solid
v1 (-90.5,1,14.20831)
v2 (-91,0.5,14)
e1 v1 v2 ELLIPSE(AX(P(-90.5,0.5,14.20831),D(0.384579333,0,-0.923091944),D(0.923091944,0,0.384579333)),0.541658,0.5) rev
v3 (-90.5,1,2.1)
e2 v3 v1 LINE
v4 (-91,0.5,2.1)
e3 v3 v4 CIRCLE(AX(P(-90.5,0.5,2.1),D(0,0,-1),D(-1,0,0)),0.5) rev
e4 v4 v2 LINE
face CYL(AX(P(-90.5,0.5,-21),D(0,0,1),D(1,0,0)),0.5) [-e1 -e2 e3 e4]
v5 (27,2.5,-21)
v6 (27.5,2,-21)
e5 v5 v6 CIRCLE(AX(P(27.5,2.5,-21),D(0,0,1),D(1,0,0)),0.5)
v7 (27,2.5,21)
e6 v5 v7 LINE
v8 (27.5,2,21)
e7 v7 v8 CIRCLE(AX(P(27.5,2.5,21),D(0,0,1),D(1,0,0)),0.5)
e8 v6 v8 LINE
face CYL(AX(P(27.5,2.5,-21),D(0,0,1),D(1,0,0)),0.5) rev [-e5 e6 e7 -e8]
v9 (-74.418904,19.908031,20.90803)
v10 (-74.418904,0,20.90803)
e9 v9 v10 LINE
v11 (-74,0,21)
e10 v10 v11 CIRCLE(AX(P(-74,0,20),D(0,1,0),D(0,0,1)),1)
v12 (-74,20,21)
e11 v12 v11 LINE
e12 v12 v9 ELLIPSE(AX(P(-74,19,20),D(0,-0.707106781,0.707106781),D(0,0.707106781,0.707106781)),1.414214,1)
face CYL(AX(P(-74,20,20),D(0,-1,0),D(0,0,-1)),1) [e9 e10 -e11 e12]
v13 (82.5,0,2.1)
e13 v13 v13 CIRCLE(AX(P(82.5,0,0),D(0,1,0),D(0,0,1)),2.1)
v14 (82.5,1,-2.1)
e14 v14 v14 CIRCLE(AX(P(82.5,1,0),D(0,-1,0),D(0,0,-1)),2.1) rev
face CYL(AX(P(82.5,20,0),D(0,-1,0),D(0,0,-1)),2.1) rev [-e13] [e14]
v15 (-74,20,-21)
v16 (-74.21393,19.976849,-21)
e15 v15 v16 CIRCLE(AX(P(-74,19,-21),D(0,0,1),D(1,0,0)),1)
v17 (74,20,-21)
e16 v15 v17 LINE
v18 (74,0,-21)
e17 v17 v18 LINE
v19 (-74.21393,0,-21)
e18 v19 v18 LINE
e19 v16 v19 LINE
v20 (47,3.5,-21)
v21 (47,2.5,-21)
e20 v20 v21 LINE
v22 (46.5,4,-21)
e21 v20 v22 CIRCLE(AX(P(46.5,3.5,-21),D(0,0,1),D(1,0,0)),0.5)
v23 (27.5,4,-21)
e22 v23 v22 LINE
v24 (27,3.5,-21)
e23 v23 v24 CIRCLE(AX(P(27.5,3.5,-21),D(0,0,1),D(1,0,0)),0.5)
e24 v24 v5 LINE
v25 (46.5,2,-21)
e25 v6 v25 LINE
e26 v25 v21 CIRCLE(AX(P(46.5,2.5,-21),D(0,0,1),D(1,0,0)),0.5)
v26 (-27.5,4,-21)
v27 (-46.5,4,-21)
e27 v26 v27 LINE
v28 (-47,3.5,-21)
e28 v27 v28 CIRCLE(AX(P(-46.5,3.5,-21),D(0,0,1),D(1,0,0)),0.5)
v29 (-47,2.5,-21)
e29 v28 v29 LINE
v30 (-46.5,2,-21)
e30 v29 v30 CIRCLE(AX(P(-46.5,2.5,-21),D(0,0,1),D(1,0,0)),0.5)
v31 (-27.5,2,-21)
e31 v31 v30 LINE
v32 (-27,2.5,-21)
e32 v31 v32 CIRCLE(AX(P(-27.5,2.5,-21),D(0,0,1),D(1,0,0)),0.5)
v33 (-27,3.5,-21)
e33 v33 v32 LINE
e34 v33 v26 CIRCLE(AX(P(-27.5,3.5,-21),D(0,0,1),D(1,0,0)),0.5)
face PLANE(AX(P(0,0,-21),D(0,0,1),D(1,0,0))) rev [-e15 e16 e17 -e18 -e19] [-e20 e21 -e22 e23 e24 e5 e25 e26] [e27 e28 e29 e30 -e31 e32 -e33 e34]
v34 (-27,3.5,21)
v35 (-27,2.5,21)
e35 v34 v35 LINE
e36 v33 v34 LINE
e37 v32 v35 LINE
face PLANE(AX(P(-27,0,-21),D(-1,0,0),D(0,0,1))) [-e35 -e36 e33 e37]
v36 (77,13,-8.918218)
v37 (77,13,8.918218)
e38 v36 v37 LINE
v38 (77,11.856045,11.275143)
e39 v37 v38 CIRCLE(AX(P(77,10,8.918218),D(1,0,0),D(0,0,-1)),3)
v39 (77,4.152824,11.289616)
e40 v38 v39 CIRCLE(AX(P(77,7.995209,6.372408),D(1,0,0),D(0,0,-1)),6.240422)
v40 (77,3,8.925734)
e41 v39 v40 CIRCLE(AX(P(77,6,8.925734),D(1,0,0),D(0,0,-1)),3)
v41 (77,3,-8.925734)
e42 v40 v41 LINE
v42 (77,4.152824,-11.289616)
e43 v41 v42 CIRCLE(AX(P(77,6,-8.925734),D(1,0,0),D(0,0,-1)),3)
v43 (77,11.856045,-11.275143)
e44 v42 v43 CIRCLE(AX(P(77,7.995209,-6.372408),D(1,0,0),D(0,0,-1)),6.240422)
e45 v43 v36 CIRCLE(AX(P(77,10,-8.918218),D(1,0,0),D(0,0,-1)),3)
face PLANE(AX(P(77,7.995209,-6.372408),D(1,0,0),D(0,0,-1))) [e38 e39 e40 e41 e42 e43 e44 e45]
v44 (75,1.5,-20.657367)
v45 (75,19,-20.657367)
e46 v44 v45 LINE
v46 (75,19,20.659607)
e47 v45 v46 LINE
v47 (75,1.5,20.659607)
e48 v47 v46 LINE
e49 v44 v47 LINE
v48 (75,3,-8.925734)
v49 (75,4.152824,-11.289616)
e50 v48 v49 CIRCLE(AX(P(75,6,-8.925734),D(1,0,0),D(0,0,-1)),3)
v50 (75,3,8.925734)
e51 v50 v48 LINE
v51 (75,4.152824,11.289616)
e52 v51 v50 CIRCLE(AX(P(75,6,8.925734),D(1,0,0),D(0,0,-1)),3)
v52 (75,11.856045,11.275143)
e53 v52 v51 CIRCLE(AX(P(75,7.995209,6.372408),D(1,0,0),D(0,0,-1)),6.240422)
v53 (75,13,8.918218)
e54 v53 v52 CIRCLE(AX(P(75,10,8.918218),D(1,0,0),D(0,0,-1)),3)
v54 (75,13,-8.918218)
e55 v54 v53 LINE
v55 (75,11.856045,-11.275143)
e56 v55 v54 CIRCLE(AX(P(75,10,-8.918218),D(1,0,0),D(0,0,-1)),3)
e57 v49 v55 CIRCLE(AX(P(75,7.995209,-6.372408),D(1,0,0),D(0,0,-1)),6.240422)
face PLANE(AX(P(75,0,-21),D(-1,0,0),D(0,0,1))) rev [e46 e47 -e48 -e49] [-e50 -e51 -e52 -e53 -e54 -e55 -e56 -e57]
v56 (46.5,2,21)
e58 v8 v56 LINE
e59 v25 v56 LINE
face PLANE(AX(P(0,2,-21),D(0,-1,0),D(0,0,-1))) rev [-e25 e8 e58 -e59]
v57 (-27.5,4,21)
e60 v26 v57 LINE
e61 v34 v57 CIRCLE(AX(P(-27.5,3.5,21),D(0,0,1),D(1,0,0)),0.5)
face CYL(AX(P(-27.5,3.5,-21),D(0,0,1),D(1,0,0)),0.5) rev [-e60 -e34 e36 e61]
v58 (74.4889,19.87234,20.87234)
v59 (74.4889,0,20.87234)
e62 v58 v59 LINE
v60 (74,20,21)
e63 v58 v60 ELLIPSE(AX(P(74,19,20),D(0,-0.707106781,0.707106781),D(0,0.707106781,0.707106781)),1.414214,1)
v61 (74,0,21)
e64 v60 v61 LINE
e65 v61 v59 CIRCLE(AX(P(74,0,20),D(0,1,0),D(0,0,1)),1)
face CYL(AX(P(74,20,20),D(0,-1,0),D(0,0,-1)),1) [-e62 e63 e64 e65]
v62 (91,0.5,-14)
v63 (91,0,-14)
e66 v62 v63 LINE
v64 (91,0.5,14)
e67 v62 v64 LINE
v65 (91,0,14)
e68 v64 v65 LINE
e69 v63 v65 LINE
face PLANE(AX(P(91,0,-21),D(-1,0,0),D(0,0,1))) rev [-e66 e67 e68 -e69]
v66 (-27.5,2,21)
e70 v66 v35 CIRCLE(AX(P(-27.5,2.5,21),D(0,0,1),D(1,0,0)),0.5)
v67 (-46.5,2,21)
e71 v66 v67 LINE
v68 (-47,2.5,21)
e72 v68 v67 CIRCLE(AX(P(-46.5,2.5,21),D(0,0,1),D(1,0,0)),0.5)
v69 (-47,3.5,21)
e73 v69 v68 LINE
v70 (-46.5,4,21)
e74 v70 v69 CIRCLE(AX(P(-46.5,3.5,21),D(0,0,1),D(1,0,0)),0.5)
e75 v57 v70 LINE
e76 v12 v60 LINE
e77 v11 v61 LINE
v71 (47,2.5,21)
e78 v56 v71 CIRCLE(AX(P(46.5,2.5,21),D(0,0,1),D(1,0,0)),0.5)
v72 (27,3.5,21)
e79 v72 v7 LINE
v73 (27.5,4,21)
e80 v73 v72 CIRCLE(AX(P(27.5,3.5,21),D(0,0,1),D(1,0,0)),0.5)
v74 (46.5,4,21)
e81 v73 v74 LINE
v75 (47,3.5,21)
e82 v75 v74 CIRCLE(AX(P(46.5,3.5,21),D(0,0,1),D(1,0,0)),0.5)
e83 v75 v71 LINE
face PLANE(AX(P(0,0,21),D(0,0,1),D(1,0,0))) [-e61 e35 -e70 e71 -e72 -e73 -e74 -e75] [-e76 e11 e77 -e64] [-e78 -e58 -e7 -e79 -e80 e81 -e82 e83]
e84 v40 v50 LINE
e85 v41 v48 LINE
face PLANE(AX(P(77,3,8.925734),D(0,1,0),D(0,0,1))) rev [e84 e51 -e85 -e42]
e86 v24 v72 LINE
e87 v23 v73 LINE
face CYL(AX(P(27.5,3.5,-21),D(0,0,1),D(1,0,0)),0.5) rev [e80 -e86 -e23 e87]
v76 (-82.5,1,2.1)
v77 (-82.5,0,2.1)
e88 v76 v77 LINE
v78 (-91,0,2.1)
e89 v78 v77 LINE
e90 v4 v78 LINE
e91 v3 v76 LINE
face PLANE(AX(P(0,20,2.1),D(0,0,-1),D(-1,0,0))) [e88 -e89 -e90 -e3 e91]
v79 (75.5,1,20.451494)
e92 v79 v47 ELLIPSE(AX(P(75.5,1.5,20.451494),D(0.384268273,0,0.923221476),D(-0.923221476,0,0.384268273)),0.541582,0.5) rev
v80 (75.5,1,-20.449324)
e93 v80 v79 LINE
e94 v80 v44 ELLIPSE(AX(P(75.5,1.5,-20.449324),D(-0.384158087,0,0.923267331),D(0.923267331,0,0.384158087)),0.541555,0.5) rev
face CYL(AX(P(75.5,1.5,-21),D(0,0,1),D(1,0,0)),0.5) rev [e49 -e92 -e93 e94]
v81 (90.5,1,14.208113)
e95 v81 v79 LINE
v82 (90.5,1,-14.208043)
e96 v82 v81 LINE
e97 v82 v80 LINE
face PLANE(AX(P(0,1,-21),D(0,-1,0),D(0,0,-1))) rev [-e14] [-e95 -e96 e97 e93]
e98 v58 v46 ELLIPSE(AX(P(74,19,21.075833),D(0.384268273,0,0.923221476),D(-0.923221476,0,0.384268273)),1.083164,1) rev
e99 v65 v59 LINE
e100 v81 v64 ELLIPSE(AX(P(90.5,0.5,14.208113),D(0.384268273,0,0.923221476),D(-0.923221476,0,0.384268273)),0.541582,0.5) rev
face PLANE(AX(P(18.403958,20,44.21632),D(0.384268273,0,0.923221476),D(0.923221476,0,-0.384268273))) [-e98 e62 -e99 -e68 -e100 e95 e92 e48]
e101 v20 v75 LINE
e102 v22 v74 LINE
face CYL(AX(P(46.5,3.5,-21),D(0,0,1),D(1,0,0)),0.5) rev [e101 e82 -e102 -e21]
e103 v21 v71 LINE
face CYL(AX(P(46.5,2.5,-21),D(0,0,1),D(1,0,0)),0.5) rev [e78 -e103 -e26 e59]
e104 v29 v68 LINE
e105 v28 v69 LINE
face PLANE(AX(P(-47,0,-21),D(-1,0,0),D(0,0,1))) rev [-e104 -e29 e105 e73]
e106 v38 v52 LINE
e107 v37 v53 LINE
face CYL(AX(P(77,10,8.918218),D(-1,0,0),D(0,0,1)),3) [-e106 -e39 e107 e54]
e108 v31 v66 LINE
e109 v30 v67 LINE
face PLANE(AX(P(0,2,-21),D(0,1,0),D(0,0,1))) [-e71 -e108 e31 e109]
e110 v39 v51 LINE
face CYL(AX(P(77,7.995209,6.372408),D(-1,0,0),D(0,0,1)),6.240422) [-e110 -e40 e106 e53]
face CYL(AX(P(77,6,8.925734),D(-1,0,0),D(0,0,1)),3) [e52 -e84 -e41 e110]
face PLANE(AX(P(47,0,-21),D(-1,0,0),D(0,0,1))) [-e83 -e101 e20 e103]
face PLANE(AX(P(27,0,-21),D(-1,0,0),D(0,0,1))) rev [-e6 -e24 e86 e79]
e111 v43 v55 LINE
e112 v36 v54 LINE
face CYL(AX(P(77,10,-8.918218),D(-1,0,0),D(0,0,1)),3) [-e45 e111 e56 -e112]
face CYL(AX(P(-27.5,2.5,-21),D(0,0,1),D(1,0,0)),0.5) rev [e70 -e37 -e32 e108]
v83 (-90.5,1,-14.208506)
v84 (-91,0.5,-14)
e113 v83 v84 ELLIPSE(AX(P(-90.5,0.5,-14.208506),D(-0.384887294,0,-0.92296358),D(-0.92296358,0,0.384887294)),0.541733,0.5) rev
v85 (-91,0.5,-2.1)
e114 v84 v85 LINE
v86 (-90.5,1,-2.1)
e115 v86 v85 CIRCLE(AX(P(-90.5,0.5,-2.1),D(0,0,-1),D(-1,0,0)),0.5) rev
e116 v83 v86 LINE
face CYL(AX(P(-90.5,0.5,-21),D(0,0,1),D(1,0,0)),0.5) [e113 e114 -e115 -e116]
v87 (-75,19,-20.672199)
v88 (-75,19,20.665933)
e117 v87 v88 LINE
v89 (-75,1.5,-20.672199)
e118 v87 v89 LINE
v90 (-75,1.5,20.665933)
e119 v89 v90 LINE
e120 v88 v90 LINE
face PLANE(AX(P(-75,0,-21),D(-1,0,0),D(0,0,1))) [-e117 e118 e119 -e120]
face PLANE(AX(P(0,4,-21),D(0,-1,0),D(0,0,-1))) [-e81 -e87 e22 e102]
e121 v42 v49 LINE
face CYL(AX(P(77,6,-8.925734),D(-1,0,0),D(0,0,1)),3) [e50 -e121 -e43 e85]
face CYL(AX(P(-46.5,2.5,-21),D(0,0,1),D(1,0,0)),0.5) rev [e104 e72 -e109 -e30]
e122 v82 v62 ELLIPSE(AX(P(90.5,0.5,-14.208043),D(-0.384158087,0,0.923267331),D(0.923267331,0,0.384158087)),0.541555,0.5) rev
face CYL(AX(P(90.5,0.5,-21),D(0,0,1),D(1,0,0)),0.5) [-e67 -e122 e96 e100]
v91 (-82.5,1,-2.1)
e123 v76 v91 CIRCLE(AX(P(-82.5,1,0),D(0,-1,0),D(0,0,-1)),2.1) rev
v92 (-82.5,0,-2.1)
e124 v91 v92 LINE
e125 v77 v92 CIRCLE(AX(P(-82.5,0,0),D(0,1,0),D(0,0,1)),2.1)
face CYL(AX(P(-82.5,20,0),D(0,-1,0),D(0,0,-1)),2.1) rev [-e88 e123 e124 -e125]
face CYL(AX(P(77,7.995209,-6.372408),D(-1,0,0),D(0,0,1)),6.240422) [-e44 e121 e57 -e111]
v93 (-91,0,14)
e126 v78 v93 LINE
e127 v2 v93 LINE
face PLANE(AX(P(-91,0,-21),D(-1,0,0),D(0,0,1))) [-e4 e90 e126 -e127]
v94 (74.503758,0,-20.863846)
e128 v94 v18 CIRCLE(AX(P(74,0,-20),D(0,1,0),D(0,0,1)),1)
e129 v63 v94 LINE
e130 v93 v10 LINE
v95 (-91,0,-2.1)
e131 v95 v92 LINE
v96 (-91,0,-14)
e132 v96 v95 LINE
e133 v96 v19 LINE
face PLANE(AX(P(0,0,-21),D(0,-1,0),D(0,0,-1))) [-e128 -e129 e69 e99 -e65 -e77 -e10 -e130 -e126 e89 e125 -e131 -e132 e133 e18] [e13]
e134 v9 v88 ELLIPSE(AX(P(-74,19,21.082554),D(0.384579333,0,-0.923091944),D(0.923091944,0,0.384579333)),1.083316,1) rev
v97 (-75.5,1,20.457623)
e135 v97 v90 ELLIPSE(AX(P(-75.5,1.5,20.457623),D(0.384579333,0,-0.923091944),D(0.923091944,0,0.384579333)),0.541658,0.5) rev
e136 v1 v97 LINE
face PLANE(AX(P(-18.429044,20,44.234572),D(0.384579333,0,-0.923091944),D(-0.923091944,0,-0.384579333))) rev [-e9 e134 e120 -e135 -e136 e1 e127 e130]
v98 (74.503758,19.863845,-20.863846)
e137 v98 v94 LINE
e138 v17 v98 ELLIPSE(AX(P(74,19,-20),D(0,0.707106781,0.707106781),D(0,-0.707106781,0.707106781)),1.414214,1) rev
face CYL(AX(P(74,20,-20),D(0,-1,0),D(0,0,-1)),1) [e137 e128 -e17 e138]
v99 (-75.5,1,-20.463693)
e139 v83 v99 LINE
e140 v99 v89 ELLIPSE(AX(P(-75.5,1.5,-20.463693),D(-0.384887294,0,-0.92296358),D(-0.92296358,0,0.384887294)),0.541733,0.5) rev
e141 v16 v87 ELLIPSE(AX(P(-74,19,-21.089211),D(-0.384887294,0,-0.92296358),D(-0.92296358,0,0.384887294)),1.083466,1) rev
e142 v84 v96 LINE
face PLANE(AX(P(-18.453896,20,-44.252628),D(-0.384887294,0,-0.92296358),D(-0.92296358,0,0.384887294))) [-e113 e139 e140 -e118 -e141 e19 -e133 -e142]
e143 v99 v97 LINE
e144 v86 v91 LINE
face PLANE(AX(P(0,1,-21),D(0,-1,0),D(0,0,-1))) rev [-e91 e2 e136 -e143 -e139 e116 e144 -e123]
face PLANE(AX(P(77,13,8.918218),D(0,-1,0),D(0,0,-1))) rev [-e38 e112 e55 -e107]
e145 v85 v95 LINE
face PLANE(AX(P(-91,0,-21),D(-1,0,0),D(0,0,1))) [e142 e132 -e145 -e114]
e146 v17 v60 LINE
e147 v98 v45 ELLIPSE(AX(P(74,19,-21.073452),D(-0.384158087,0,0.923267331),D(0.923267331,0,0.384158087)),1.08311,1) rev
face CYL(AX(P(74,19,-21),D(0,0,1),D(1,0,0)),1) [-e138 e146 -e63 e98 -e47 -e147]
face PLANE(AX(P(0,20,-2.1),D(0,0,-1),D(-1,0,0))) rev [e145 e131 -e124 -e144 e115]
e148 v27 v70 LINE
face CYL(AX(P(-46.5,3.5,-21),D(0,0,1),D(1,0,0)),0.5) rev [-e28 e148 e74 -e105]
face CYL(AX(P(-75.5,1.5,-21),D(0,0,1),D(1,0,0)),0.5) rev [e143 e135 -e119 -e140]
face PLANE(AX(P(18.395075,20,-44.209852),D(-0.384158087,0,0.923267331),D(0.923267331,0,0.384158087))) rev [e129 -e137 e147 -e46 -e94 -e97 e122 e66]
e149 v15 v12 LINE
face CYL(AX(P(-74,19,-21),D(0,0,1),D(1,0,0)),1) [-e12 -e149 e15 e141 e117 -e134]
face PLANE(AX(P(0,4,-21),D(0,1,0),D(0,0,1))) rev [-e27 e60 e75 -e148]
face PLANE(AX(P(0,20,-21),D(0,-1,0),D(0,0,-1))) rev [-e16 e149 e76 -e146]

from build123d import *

# Parameters (mm, degrees)
EXTRUDE_START           = 21
EXTRUDE_1_DEPTH         = 42
CUT_EXTRUDE_4_OUTLINE_R = 2.1
CUT_EXTRUDE_4_DEPTH     = 20
EXTRUDE_2_DEPTH         = 2


# Read off the part's stored shape, not the designer's step: ｶｯﾄ - 押し出し4
with BuildPart() as part:
    # ｽｹｯﾁ2 → ﾎﾞｽ - 押し出し1 (new body)
    with BuildSketch(Plane.XY.offset(EXTRUDE_START)):
        with BuildLine():
            ThreePointArc((-75.5, 1), (-75.146446609, 1.146446609), (-75, 1.5))
            Line((-75, 1.5), (-75, 19))
            ThreePointArc((-75, 19), (-74.707106781, 19.707106781), (-74, 20))
            Line((-74, 20), (74, 20))
            ThreePointArc((74, 20), (74.707106781, 19.707106781), (75, 19))
            Line((75, 19), (75, 1.5))
            ThreePointArc((75, 1.5), (75.146446609, 1.146446609), (75.5, 1))
            Line((75.5, 1), (90.5, 1))
            ThreePointArc((90.5, 1), (90.853553391, 0.853553391), (91, 0.5))
            Line((91, 0.5), (91, 0))
            Line((91, 0), (-91, 0))
            Line((-91, 0), (-91, 0.5))
            ThreePointArc((-91, 0.5), (-90.853553391, 0.853553391), (-90.5, 1))
            Line((-90.5, 1), (-75.5, 1))
        make_face()
        with BuildLine():
            ThreePointArc((-27.5, 2), (-27.146446609, 2.146446609), (-27, 2.5))
            Line((-27, 2.5), (-27, 3.5))
            ThreePointArc((-27, 3.5), (-27.146446609, 3.853553391), (-27.5, 4))
            Line((-27.5, 4), (-46.5, 4))
            ThreePointArc((-46.5, 4), (-46.853553391, 3.853553391), (-47, 3.5))
            Line((-47, 3.5), (-47, 2.5))
            ThreePointArc((-47, 2.5), (-46.853553391, 2.146446609), (-46.5, 2))
            Line((-46.5, 2), (-27.5, 2))
        make_face(mode=Mode.SUBTRACT)
        with BuildLine():
            ThreePointArc((27, 2.5), (27.146446609, 2.146446609), (27.5, 2))
            Line((27.5, 2), (46.5, 2))
            ThreePointArc((46.5, 2), (46.853553391, 2.146446609), (47, 2.5))
            Line((47, 2.5), (47, 3.5))
            ThreePointArc((47, 3.5), (46.853553391, 3.853553391), (46.5, 4))
            Line((46.5, 4), (27.5, 4))
            ThreePointArc((27.5, 4), (27.146446609, 3.853553391), (27, 3.5))
            Line((27, 3.5), (27, 2.5))
        make_face(mode=Mode.SUBTRACT)
    extrude(amount=-EXTRUDE_1_DEPTH)

    # ｶｯﾄ - 押し出し4 outline → ｶｯﾄ - 押し出し4 (cut)
    with BuildSketch(Plane(origin=(0, 0, 0), x_dir=(1, 0, 0), z_dir=(0, 1, 0))):
        with BuildLine():
            ThreePointArc((-74, -21), (-74.214440627, -20.976737026), (-74.418904201, -20.908030435))
            Line((-74.418904201, -20.908030435), (-91, -14))
            Line((-91, -14), (-91, -21))
            Line((-91, -21), (-74, -21))
        make_face()
        with BuildLine():
            ThreePointArc((74.488899944, -20.872339868), (74.252646128, -20.96755875), (74, -21))
            Line((74, -21), (91, -21))
            Line((91, -21), (91, -14))
            Line((91, -14), (74.488899944, -20.872339868))
        make_face()
        Polygon((-74.21393, 21), (-91, 21), (-91, 14), align=None)
        with BuildLine():
            Line((-91, 2.1), (-91, -2.1))
            Line((-91, -2.1), (-82.5, -2.1))
            ThreePointArc((-82.5, -2.1), (-80.4, 0), (-82.5, 2.1))
            Line((-82.5, 2.1), (-91, 2.1))
        make_face()
        with BuildLine():
            Line((91, 21), (74, 21))
            ThreePointArc((74, 21), (74.260916595, 20.965361347), (74.503757591, 20.863845061))
            Line((74.503757591, 20.863845061), (91, 14))
            Line((91, 14), (91, 21))
        make_face()
        with Locations((82.5, 0)):
            Circle(CUT_EXTRUDE_4_OUTLINE_R)
    extrude(amount=CUT_EXTRUDE_4_DEPTH, mode=Mode.SUBTRACT)

    # ｽｹｯﾁ5 → ﾎﾞｽ - 押し出し2 (add)
    with BuildSketch(Plane(origin=(75, 0, 0), x_dir=(0, 0, -1), z_dir=(1, 0, 0))):
        with BuildLine():
            Line((-8.925734, 3), (8.925734, 3))
            ThreePointArc((8.925734, 3), (10.240738094, 3.303564532), (11.289616453, 4.152823844))
            ThreePointArc((11.289616453, 4.152823844), (12.612818852, 8.006934379), (11.275142981, 11.856045429))
            ThreePointArc((11.275142981, 11.856045429), (10.228153822, 12.698901284), (8.918218, 13))
            Line((8.918218, 13), (-8.918218, 13))
            ThreePointArc((-8.918218, 13), (-10.228153822, 12.698901284), (-11.275142981, 11.856045429))
            ThreePointArc((-11.275142981, 11.856045429), (-12.612818852, 8.006934379), (-11.289616453, 4.152823844))
            ThreePointArc((-11.289616453, 4.152823844), (-10.240738094, 3.303564532), (-8.925734, 3))
        make_face()
    extrude(amount=EXTRUDE_2_DEPTH)


solid = part.part
